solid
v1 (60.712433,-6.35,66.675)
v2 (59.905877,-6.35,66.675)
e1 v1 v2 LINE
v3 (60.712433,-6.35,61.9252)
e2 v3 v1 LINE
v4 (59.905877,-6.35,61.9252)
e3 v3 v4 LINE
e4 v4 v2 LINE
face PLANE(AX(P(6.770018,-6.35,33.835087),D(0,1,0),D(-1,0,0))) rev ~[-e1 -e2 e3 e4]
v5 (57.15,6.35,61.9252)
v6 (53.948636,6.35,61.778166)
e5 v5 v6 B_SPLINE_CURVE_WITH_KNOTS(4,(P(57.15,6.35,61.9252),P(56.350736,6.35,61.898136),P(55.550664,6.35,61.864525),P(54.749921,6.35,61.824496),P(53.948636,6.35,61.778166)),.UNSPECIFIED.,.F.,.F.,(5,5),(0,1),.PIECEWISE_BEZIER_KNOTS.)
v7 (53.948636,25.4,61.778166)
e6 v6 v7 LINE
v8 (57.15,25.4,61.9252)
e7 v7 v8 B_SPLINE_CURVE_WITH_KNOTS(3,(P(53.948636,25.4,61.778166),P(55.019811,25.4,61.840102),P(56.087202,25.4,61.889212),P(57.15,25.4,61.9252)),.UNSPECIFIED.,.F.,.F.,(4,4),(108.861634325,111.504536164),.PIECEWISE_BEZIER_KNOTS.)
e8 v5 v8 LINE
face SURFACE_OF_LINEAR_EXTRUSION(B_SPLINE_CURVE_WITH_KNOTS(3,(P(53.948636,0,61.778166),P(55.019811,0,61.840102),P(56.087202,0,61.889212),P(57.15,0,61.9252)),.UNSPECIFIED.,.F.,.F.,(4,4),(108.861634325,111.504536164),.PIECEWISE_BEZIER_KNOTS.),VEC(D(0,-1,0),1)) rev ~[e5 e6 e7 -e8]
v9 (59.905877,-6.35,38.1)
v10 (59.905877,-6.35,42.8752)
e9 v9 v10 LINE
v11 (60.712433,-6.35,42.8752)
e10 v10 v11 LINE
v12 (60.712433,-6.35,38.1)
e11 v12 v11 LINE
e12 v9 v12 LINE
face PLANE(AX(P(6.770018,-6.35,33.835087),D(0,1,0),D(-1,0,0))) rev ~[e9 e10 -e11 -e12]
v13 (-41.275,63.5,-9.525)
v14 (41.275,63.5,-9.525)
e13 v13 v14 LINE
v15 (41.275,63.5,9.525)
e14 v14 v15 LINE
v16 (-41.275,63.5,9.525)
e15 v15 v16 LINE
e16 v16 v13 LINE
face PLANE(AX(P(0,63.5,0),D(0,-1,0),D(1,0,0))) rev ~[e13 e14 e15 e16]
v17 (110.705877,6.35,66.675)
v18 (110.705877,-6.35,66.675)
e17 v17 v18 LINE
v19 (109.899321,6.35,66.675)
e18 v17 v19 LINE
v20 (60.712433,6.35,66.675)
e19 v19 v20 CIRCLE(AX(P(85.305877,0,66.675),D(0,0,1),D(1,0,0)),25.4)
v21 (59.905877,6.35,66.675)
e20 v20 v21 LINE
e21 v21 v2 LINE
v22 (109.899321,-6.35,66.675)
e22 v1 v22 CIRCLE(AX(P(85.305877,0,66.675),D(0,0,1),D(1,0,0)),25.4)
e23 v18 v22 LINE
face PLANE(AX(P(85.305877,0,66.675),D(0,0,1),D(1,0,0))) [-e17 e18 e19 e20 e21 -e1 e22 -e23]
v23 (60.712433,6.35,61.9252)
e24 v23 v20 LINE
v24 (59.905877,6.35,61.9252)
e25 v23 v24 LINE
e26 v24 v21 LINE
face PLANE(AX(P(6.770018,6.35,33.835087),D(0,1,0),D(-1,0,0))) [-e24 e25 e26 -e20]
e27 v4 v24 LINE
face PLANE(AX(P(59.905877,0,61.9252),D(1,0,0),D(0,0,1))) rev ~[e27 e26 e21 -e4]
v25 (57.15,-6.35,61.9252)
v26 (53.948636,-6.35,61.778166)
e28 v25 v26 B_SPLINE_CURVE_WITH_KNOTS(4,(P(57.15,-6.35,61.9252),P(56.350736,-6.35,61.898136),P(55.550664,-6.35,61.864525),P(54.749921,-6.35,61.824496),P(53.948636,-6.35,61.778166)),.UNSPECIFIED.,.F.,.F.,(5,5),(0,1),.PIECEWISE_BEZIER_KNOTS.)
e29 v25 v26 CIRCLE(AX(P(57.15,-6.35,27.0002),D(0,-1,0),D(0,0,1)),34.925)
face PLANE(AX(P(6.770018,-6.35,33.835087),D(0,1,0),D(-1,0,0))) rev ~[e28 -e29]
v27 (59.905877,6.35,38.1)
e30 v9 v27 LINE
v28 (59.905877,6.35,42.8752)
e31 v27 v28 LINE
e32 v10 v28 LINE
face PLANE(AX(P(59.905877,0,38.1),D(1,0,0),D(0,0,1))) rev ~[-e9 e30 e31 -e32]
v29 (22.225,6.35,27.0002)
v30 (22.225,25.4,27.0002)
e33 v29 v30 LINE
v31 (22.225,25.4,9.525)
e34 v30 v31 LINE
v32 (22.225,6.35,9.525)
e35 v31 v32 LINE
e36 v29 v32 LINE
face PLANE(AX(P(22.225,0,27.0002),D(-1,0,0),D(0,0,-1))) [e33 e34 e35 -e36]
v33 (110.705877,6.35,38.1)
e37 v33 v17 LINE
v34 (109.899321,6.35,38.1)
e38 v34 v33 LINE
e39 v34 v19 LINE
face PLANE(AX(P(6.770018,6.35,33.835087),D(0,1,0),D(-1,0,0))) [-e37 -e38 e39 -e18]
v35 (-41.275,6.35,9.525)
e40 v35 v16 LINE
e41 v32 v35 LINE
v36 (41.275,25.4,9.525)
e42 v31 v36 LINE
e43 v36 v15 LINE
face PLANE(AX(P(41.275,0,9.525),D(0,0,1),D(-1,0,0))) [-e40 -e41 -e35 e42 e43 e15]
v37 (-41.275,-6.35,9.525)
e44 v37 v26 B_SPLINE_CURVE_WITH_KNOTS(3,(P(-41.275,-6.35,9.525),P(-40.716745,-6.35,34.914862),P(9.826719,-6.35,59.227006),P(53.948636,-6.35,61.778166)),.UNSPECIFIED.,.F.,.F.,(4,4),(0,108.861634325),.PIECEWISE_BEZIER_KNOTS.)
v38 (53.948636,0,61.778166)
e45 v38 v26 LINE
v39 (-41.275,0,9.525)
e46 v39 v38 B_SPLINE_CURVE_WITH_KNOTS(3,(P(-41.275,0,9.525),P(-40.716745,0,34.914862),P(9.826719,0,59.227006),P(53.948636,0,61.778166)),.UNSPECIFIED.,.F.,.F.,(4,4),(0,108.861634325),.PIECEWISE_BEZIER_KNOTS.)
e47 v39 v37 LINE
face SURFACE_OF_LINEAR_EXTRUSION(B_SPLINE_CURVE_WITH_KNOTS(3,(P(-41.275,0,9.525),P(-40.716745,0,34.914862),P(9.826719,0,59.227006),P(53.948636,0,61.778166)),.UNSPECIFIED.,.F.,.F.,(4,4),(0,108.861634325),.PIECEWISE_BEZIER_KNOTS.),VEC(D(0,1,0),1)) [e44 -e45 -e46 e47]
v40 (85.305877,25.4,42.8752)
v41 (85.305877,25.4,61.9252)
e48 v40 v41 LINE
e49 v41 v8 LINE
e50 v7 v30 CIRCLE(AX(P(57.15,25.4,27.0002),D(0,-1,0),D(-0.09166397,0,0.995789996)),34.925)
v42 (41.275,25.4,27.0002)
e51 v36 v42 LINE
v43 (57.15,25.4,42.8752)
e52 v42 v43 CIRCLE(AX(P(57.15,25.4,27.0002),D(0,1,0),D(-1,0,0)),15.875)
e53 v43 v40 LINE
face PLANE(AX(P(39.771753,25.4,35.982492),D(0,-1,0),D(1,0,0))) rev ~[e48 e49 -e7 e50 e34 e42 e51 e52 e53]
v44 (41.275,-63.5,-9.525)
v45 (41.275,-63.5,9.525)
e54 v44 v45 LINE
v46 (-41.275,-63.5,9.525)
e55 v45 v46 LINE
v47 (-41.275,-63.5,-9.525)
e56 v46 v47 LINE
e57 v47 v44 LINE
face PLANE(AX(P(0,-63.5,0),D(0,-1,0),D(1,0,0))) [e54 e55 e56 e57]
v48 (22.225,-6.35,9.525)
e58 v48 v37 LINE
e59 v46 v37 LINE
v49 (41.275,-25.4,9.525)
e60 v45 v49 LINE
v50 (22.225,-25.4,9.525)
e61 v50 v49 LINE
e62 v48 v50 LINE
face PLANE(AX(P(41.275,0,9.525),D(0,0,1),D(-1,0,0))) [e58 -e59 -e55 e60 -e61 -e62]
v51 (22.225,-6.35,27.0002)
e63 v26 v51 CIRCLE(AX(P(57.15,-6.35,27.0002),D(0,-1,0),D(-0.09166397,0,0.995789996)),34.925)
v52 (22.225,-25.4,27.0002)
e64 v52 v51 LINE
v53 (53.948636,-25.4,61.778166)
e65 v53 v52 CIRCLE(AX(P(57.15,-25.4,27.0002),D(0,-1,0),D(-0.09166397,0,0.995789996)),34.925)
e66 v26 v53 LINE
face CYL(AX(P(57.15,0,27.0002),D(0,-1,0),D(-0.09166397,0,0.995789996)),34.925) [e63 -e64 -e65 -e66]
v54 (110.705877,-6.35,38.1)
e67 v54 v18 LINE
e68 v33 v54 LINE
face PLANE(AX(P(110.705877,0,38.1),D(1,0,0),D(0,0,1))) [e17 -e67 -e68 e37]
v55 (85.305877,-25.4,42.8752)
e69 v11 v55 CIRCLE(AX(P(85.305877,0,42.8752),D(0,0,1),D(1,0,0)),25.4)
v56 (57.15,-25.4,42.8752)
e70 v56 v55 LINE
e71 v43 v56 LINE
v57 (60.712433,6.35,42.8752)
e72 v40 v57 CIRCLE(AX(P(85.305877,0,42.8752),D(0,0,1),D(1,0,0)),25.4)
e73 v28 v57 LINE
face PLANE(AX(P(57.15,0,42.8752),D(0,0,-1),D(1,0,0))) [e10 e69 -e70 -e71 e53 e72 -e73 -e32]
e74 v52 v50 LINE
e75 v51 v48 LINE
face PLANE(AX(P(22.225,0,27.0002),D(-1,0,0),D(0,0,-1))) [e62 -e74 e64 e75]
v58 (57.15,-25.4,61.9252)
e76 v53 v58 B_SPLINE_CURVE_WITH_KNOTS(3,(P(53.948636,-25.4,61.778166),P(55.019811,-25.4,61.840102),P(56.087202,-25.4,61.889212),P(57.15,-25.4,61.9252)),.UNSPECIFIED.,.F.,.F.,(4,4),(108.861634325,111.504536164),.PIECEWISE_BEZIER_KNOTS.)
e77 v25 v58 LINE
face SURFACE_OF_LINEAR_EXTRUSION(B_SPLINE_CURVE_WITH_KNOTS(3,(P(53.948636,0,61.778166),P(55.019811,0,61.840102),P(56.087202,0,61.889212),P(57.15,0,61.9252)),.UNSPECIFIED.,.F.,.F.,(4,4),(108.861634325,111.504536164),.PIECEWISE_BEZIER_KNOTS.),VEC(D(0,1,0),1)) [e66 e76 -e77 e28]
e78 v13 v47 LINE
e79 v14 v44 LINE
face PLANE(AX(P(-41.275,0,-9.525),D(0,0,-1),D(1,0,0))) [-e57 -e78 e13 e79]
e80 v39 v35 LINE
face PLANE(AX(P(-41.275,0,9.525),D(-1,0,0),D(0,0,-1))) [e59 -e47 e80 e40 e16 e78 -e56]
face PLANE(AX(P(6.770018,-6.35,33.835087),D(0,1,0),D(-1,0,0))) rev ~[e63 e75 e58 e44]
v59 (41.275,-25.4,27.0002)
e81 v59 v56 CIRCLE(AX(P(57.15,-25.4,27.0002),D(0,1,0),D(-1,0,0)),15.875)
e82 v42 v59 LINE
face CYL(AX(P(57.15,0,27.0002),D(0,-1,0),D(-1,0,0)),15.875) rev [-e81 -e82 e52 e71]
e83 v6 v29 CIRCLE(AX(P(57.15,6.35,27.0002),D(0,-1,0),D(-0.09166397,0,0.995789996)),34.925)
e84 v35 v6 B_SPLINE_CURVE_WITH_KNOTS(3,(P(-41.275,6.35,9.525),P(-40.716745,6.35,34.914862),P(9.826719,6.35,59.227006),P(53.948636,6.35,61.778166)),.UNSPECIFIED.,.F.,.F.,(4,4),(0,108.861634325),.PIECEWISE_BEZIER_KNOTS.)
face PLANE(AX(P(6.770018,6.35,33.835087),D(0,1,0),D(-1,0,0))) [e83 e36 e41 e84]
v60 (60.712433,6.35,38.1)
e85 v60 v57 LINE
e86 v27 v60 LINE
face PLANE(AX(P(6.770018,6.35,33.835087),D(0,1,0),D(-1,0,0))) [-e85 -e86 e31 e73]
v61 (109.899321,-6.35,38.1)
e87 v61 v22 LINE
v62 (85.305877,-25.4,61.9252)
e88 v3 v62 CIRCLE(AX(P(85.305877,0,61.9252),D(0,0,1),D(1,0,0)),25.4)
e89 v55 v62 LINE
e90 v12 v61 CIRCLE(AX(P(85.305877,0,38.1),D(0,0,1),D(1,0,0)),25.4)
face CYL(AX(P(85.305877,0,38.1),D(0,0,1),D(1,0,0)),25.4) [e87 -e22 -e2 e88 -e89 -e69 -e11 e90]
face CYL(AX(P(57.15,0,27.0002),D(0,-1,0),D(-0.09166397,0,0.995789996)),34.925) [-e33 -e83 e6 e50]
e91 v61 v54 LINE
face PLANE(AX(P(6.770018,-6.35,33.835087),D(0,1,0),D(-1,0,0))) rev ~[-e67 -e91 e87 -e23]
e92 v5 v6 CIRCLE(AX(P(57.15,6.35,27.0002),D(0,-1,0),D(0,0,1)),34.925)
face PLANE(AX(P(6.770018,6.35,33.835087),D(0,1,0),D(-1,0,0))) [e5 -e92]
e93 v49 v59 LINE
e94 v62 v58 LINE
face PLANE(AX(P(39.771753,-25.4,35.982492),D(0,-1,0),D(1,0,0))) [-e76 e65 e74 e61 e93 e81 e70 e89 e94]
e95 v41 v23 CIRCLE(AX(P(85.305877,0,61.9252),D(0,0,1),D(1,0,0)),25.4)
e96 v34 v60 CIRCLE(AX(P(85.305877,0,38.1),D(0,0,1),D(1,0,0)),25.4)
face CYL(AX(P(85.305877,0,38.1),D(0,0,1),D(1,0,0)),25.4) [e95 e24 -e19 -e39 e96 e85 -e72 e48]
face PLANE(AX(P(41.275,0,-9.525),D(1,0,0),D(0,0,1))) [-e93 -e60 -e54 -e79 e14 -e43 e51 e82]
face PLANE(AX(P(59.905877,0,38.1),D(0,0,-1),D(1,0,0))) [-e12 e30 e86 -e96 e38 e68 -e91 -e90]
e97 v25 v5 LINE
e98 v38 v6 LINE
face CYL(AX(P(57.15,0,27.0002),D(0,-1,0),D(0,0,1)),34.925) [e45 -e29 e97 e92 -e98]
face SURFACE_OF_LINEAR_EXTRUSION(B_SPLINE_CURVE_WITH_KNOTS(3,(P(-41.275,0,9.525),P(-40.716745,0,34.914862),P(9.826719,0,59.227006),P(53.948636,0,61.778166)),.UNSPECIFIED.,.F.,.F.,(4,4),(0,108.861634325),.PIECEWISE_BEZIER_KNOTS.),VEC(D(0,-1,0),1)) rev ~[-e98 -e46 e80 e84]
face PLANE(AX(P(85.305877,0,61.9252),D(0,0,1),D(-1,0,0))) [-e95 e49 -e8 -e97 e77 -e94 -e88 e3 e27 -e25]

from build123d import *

# Parameters (mm, degrees)
F1_DEPTH = 63.5
F0_W     = 25.4
F0_H     = 19.05
F2_DEPTH = 25.4
F0_H_2   = 4.7498
F0_H_3   = 4.7752
F3_DEPTH = 6.35


with BuildPart() as f1:
    # F0 (on Front) → F1 (new body, symmetric)
    with BuildSketch(Plane.XZ):
        Polygon((22.225, 9.525), (-41.275, 9.525), (-41.275, -9.525), (41.275, -9.525), (41.275, 9.525), align=None)
    extrude(amount=F1_DEPTH, both=True)

    # F0 (on Front) → F2 (join, symmetric)
    with BuildSketch(Plane.XZ):
        with BuildLine():
            Line((22.225, 27.0002), (22.225, 9.525))
            Line((22.225, 9.525), (41.275, 9.525))
            Line((41.275, 9.525), (41.275, 27.0002))
            ThreePointArc((41.275, 27.0002), (45.9246798487, 38.2255201513), (57.15, 42.8752))
            Line((57.15, 42.8752), (59.9058770299, 42.8752))
            Line((59.9058770299, 42.8752), (59.9058770299, 61.9252))
            Line((59.9058770299, 61.9252), (57.15, 61.9252))
            add(Edge.make_bspline(
                [(53.9486358341, 61.7781656173), (55.0198111494, 61.8401017222), (56.0872015852, 61.8892118375), (57.15, 61.9252)],
                knots=[108.8616343251, 108.8616343251, 108.8616343251, 108.8616343251, 111.5045361635, 111.5045361635, 111.5045361635, 111.5045361635], degree=3))
            ThreePointArc((53.9486358341, 61.7781656173), (31.3472552962, 50.5368520719), (22.225, 27.0002))
        make_face()
        with Locations((72.6058770299, 52.4002)):
            Rectangle(F0_W, F0_H)
    extrude(amount=F2_DEPTH, both=True)

    # F0 (on Front) → F3 (join, symmetric)
    with BuildSketch(Plane.XZ):
        with BuildLine():
            add(Edge.make_bspline(
                [(-41.275, 9.525), (-40.7167454474, 34.9148619979), (9.8267188659, 59.2270055586), (53.9486358341, 61.7781656173)],
                knots=[0, 0, 0, 0, 108.8616343251, 108.8616343251, 108.8616343251, 108.8616343251], degree=3))
            Line((-41.275, 9.525), (22.225, 9.525))
            Line((22.225, 9.525), (22.225, 27.0002))
            ThreePointArc((22.225, 27.0002), (31.3472552962, 50.5368520719), (53.9486358341, 61.7781656173))
        make_face()
        Polygon((22.225, 9.525), (-41.275, 9.525), (-41.275, -9.525), (41.275, -9.525), (41.275, 9.525), align=None)
        with BuildLine():
            Line((22.225, 27.0002), (22.225, 9.525))
            Line((22.225, 9.525), (41.275, 9.525))
            Line((41.275, 9.525), (41.275, 27.0002))
            ThreePointArc((41.275, 27.0002), (45.9246798487, 38.2255201513), (57.15, 42.8752))
            Line((57.15, 42.8752), (59.9058770299, 42.8752))
            Line((59.9058770299, 42.8752), (59.9058770299, 61.9252))
            Line((59.9058770299, 61.9252), (57.15, 61.9252))
            add(Edge.make_bspline(
                [(53.9486358341, 61.7781656173), (55.0198111494, 61.8401017222), (56.0872015852, 61.8892118375), (57.15, 61.9252)],
                knots=[108.8616343251, 108.8616343251, 108.8616343251, 108.8616343251, 111.5045361635, 111.5045361635, 111.5045361635, 111.5045361635], degree=3))
            ThreePointArc((53.9486358341, 61.7781656173), (31.3472552962, 50.5368520719), (22.225, 27.0002))
        make_face()
        with BuildLine():
            ThreePointArc((57.15, 61.9252), (55.5476305332, 61.8884220397), (53.9486358341, 61.7781656173))
            add(Edge.make_bspline(
                [(53.9486358341, 61.7781656173), (55.0198111494, 61.8401017222), (56.0872015852, 61.8892118375), (57.15, 61.9252)],
                knots=[108.8616343251, 108.8616343251, 108.8616343251, 108.8616343251, 111.5045361635, 111.5045361635, 111.5045361635, 111.5045361635], degree=3))
        make_face()
        with Locations((72.6058770299, 52.4002)):
            Rectangle(F0_W, F0_H)
        with Locations((72.6058770299, 64.3001)):
            Rectangle(F0_W, F0_H_2)
        with Locations((72.6058770299, 40.4876)):
            Rectangle(F0_W, F0_H_3)
        Polygon((85.3058770299, 66.675), (85.3058770299, 61.9252), (85.3058770299, 42.8752), (85.3058770299, 38.1), (110.7058770299, 38.1), (110.7058770299, 66.675), align=None)
    extrude(amount=F3_DEPTH, both=True)

    # F0 (on Front) → F4 (revolve)
    with BuildSketch(Plane.XZ):
        Polygon((85.3058770299, 66.675), (85.3058770299, 61.9252), (85.3058770299, 42.8752), (85.3058770299, 38.1), (110.7058770299, 38.1), (110.7058770299, 66.675), align=None)
    revolve(axis=Axis((85.3058770299, 0, 52.3875), (0, 0, 1)))


solid = f1.part
